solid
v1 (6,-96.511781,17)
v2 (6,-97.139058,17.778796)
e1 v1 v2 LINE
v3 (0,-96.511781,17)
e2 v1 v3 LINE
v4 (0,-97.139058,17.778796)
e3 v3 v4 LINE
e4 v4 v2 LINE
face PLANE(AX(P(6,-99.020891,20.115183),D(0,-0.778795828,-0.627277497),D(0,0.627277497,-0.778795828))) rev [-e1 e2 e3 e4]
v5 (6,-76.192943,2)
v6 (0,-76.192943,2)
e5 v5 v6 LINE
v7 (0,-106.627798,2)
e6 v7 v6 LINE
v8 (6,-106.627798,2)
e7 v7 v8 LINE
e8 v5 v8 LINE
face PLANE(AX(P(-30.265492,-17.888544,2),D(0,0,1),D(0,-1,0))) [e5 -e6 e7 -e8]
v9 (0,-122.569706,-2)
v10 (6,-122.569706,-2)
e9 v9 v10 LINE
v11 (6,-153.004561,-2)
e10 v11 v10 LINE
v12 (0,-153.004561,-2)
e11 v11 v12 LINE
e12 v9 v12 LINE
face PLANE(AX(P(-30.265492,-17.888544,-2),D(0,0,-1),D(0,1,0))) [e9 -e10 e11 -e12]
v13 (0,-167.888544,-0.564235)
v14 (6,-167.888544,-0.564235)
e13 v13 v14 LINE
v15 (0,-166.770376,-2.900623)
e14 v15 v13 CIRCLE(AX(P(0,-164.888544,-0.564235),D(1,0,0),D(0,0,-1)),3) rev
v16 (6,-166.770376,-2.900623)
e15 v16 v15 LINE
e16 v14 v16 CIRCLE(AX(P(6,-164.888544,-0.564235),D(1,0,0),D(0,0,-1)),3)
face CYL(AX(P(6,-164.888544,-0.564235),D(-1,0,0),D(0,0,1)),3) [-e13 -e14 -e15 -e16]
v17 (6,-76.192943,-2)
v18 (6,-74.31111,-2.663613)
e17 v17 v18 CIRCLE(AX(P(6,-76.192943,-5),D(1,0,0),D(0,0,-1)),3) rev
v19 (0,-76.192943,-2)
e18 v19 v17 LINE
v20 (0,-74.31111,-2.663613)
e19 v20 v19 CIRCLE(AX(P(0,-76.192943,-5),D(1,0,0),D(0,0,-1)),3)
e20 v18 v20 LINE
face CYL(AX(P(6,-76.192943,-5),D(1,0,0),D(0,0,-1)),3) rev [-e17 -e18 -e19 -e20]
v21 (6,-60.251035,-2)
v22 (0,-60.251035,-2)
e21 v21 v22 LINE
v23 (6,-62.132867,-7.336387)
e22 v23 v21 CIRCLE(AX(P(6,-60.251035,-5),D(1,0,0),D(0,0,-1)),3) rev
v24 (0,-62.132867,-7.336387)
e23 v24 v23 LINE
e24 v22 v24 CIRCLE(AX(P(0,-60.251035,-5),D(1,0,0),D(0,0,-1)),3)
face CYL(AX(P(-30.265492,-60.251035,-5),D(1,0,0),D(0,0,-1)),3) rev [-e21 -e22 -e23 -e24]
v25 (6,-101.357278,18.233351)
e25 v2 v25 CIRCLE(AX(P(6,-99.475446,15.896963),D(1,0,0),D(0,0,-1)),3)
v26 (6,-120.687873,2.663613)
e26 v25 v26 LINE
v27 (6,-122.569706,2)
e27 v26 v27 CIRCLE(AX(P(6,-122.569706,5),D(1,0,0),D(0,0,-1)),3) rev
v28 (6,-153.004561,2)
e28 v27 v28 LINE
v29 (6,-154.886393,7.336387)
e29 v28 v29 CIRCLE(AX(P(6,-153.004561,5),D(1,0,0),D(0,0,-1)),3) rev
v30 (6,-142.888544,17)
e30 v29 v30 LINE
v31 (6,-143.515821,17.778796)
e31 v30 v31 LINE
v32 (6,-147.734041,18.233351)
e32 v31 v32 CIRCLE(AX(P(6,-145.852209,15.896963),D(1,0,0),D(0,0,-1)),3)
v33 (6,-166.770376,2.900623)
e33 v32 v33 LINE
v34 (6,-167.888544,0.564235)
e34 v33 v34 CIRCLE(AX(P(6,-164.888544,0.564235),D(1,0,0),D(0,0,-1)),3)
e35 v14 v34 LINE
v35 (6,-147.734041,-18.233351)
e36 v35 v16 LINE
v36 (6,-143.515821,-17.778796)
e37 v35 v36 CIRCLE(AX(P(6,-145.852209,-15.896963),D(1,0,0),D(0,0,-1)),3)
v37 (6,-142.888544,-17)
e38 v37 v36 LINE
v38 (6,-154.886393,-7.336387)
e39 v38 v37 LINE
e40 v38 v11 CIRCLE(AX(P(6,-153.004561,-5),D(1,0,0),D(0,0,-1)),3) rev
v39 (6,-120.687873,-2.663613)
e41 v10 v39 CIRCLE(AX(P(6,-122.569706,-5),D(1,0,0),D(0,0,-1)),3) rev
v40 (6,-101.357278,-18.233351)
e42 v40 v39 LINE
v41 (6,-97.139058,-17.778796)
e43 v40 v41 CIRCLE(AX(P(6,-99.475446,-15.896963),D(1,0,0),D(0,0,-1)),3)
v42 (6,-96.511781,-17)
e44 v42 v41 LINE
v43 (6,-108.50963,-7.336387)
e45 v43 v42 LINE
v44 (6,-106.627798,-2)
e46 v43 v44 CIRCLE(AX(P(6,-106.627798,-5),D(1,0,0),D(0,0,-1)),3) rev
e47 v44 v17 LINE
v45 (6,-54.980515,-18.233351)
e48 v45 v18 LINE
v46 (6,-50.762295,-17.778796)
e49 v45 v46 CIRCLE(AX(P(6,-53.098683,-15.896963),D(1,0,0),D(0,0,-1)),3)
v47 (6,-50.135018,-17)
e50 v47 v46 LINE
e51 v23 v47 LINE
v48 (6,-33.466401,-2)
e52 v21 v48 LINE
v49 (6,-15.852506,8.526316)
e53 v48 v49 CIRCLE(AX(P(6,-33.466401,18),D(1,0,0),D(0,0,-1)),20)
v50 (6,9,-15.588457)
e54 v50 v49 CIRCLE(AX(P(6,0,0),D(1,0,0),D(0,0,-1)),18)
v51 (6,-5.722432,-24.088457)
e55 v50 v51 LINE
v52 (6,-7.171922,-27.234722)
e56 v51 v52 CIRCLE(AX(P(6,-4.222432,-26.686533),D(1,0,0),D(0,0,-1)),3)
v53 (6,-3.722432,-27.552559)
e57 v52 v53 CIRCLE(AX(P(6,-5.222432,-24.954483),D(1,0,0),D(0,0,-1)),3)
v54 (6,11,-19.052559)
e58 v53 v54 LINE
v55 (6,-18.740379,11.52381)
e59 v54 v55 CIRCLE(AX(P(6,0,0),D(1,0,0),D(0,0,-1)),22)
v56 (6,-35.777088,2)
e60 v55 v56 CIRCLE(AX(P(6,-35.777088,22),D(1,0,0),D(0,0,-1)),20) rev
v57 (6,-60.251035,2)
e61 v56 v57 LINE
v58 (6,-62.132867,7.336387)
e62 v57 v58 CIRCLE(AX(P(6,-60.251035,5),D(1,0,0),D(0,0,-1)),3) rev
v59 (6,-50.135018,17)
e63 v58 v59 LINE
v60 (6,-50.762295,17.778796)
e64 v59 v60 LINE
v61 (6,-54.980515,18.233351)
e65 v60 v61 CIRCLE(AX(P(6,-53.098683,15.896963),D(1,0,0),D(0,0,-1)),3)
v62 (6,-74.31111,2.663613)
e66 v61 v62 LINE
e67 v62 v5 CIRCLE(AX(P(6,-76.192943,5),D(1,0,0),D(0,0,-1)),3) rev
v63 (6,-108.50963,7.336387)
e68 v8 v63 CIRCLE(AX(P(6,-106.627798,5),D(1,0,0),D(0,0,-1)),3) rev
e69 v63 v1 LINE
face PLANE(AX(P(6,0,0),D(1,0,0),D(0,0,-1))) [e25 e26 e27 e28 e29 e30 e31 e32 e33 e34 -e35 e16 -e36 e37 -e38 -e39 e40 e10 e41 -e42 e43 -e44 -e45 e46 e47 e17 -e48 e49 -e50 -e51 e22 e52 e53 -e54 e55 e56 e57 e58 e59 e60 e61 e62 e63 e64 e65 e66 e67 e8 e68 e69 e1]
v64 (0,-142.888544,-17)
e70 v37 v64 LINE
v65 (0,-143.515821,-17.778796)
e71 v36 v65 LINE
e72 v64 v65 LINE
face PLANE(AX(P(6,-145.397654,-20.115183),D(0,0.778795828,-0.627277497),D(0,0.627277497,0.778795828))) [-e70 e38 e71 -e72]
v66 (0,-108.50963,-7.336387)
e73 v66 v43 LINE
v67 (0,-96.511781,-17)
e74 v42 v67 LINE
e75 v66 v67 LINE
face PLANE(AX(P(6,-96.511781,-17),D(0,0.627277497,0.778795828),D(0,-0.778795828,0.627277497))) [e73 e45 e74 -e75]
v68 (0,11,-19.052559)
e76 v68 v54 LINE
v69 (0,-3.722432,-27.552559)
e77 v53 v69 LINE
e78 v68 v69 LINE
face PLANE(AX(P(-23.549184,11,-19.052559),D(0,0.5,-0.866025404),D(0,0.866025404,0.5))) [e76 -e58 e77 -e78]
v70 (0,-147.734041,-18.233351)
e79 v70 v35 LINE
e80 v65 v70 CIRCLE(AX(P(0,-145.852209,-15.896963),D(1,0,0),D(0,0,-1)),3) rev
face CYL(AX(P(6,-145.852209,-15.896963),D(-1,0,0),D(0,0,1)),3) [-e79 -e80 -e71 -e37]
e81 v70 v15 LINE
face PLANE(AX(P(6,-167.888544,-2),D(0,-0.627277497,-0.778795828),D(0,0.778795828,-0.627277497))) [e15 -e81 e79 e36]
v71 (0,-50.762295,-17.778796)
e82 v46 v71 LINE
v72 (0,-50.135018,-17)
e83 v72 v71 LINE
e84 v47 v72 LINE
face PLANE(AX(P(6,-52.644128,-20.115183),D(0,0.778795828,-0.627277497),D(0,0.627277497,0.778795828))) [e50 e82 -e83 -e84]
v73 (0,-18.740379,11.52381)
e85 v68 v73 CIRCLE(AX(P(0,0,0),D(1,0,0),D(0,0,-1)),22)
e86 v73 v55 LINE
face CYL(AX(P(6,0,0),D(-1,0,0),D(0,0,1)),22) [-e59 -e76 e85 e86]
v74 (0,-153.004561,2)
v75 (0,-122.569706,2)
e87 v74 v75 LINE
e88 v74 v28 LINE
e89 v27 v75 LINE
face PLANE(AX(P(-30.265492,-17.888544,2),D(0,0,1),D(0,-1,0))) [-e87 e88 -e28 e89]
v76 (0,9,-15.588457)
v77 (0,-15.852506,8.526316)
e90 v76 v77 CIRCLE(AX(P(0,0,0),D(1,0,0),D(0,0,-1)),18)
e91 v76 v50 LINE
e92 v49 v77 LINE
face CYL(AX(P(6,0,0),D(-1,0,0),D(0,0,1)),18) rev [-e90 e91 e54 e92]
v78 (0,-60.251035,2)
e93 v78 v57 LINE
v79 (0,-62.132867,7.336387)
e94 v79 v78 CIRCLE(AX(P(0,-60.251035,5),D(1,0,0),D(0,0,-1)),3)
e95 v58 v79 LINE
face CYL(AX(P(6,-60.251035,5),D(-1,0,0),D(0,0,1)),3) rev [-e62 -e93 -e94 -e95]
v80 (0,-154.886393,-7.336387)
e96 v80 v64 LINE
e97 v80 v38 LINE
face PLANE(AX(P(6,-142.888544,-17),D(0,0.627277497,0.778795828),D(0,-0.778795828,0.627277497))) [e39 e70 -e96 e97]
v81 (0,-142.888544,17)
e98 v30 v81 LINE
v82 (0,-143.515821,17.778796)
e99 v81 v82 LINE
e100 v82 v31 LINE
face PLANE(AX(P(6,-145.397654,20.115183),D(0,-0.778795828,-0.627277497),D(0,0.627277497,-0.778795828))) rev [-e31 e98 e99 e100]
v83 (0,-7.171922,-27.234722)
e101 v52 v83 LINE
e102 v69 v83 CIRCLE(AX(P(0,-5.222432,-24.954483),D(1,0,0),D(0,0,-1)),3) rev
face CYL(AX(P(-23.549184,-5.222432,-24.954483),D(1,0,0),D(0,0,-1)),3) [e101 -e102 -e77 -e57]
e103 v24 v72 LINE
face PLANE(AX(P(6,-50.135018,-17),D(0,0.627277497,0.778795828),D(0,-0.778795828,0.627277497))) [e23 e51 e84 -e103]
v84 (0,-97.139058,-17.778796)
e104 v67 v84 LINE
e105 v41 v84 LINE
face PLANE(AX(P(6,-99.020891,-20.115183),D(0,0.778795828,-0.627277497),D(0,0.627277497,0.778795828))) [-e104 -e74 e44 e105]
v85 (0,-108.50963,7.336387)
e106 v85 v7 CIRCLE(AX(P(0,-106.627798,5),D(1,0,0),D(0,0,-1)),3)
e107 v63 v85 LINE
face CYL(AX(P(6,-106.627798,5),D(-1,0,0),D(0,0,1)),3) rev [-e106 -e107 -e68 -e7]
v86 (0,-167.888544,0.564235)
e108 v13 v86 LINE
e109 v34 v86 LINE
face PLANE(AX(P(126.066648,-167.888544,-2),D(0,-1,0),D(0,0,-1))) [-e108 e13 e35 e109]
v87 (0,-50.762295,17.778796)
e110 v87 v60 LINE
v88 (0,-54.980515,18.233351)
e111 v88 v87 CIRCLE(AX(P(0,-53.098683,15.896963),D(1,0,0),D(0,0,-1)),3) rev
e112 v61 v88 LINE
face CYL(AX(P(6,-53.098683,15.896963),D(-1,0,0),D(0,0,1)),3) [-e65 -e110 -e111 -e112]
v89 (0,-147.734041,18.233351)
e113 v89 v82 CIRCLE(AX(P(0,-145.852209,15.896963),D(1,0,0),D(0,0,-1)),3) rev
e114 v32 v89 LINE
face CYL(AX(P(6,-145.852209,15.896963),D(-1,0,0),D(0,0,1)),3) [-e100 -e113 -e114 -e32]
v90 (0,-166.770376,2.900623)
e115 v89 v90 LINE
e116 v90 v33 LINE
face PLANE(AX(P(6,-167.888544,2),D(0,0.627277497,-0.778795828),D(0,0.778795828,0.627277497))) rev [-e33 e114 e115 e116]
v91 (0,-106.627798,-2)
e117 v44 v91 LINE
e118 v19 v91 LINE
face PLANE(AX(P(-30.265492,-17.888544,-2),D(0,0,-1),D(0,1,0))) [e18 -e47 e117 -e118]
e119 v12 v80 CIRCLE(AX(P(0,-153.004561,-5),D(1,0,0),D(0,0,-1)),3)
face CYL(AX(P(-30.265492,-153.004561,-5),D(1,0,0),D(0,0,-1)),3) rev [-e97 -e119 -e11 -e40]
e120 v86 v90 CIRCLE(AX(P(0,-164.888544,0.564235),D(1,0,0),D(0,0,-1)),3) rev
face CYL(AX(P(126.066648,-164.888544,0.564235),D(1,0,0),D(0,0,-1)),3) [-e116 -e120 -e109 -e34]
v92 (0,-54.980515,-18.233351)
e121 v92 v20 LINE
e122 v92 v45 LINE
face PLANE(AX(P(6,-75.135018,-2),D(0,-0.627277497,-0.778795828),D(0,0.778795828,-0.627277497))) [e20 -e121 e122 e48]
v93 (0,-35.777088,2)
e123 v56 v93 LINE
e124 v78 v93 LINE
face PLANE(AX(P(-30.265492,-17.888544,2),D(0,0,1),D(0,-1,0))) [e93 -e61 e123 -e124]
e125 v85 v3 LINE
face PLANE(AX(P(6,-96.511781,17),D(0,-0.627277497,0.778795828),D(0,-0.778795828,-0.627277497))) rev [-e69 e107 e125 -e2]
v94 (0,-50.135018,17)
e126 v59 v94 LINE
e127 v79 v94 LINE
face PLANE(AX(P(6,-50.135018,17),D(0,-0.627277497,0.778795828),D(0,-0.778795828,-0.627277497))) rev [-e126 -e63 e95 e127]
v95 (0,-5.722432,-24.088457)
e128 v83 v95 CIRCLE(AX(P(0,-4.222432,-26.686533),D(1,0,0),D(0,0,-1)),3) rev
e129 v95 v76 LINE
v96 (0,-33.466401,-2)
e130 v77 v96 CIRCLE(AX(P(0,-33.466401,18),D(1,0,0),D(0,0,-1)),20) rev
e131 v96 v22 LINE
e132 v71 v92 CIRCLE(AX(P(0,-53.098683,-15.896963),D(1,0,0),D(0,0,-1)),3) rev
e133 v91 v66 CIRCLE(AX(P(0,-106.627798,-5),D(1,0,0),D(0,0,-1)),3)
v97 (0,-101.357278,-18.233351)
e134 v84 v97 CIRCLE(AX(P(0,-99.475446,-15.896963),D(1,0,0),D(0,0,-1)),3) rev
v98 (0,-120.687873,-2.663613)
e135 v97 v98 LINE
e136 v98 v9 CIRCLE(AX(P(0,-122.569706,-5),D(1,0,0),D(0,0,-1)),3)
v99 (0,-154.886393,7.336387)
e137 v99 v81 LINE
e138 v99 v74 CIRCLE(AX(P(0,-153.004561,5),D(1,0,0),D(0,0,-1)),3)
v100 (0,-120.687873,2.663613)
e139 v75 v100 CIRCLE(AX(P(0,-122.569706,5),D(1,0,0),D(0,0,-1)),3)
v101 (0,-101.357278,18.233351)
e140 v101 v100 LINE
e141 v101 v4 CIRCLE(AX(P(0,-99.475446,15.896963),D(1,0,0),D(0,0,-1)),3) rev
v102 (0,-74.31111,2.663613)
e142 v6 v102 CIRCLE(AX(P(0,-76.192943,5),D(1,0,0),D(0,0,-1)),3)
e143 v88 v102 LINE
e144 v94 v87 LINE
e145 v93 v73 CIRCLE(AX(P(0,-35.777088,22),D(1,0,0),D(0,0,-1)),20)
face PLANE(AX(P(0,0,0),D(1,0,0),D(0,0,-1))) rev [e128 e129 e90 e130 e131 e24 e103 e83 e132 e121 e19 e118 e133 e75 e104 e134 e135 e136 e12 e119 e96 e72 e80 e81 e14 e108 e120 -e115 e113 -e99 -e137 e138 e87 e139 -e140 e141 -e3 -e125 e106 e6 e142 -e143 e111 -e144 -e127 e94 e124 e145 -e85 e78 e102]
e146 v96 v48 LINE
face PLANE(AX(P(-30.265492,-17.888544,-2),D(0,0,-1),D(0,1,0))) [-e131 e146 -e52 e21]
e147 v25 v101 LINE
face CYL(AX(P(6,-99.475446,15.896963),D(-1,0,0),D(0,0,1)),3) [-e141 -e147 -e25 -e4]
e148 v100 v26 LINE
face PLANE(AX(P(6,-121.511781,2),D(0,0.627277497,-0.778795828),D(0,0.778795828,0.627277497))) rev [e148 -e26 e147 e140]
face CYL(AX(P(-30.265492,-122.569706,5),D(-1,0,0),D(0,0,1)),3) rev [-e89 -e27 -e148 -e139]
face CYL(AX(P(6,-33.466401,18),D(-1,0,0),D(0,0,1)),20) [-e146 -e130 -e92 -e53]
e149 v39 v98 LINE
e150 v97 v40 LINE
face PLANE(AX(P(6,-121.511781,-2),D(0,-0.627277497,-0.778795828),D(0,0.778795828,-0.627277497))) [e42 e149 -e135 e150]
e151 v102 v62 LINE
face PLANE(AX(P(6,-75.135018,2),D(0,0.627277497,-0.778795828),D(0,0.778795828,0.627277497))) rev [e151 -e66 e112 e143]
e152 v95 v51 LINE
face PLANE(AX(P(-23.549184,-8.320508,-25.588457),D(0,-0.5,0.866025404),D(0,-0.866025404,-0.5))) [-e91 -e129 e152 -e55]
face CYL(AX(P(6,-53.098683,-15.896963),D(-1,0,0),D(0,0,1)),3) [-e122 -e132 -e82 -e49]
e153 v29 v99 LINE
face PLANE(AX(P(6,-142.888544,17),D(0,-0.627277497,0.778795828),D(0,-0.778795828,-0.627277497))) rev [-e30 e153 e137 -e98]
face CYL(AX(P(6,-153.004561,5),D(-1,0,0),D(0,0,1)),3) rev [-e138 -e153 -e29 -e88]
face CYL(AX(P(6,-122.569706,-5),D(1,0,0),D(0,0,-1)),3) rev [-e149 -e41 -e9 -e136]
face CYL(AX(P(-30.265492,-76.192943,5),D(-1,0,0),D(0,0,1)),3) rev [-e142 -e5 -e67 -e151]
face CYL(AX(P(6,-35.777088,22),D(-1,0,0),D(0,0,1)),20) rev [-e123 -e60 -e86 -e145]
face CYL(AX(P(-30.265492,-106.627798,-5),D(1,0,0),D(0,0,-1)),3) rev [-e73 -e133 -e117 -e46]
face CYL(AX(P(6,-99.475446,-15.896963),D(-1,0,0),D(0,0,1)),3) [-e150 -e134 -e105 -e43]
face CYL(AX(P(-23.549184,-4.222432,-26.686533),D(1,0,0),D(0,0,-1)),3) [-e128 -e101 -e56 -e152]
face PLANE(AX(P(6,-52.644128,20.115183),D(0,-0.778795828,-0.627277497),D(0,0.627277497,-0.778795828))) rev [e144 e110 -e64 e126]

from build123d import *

# Parameters (mm, degrees)
SKETCH1_R           = 22
SKETCH1_R_2         = 18
BOSS_EXTRUDE1_DEPTH = 6
BOSS_EXTRUDE2_DEPTH = 6
CUT_EXTRUDE1_DEPTH  = 37.933063475
SKETCH4_W           = 4
SKETCH4_H           = 30
BOSS_EXTRUDE3_DEPTH = 6
CUT_EXTRUDE2_DEPTH  = 57.332617611
FILLET1_R           = 20
FILLET2_R           = 20
SKETCH6_W           = 4
SKETCH6_H           = 120
BOSS_EXTRUDE4_DEPTH = 6
BOSS_EXTRUDE5_DEPTH = 6
FILLET3_R           = 3


with BuildPart() as part:
    # Sketch1 → Boss-Extrude1 (new body)
    with BuildSketch(Plane(origin=(0, 0, 0), x_dir=(0, 0, -1), z_dir=(1, 0, 0))):
        Circle(SKETCH1_R)
        Circle(SKETCH1_R_2, mode=Mode.SUBTRACT)
    extrude(amount=BOSS_EXTRUDE1_DEPTH)

    # Sketch2 → Boss-Extrude2 (add)
    with BuildSketch(Plane(origin=(6, 0, 0), x_dir=(0, 0, -1), z_dir=(1, 0, 0))):
        Polygon((19.052558883, 11), (29.052558883, -6.320508076), (25.588457268, -8.320508076), (15.588457268, 9), align=None)
    extrude(amount=-BOSS_EXTRUDE2_DEPTH)

    # Sketch3 → Cut-Extrude1 (cut, through all)
    with BuildSketch(Plane(origin=(6, 0, 0), x_dir=(0, 0, -1), z_dir=(1, 0, 0))):
        with BuildLine():
            ThreePointArc((18, 0), (14.280360125, -10.957705722), (4.658742812, -17.386664873))
            Line((4.658742812, -17.386664873), (5.694018992, -21.250368178))
            ThreePointArc((5.694018992, -21.250368178), (16.84102585, -14.15555892), (21.913012588, -1.95445115))
            Line((21.913012588, -1.95445115), (15.588457268, 9))
            ThreePointArc((15.588457268, 9), (17.386664873, 4.658742812), (18, 0))
        make_face()
    extrude(amount=-CUT_EXTRUDE1_DEPTH, mode=Mode.SUBTRACT)

    # Sketch4 → Boss-Extrude3 (add)
    with BuildSketch(Plane(origin=(6, 0, 0), x_dir=(0, 0, -1), z_dir=(1, 0, 0))):
        with Locations((0, -32.88854382)):
            Rectangle(SKETCH4_W, SKETCH4_H)
    extrude(amount=-BOSS_EXTRUDE3_DEPTH)

    # Sketch5 → Cut-Extrude2 (cut, through all)
    with BuildSketch(Plane(origin=(6, 0, 0), x_dir=(0, 0, -1), z_dir=(1, 0, 0))):
        with BuildLine():
            Line((2, -21.9089023), (2, -17.88854382))
            Line((2, -17.88854382), (4.658742812, -17.386664873))
            Line((4.658742812, -17.386664873), (5.694018992, -21.250368178))
            ThreePointArc((5.694018992, -21.250368178), (3.876129227, -21.742981124), (2, -21.9089023))
        make_face()
    extrude(amount=-CUT_EXTRUDE2_DEPTH, mode=Mode.SUBTRACT)

    # Fillet1
    # the kernel refuses this fillet: 20 mm, written as the material it adds along each edge
    with BuildSketch(Plane(origin=(6, -21.9089023, 2), x_dir=(0, -1, 0), z_dir=(-1, 0, 0))) as fillet1_piece_1:
        with BuildLine():
            CenterArc((13.86818534, 20), FILLET1_R, 211.588135505, 58.411864495)
            ThreePointArc((-3.16852306, 9.523809524), (-1.033875129, 4.945015522), (0, 0))
            Line((0, 0), (13.86818534, 0))
        make_face()
    extrude(amount=6)
    # the kernel refuses this fillet: 20 mm, written as the material it takes off along each edge
    with BuildSketch(Plane(origin=(36, -17.88854382, -2), x_dir=(0, -1, 0), z_dir=(-1, 0, 0))) as fillet1_2_piece_1:
        with BuildLine():
            CenterArc((12, 20), FILLET1_R, 233.130102354, 36.869897646)
            Line((0, 4), (0, 0))
            Line((0, 0), (12, 0))
        make_face()
    extrude(amount=66, mode=Mode.SUBTRACT)

    # Fillet2
    fillet2_edges = [part.edges().sort_by_distance(p)[0] for p in [
        (3, -17.88854382, 2),
    ]]
    fillet(fillet2_edges, radius=FILLET2_R)

    # Sketch6 → Boss-Extrude4 (add)
    with BuildSketch(Plane.ZY):
        with Locations((0, -107.88854382)):
            Rectangle(SKETCH6_W, SKETCH6_H)
    extrude(amount=-BOSS_EXTRUDE4_DEPTH)

    # Sketch7 → Boss-Extrude5 (add)
    with BuildSketch(Plane(origin=(0, 0, -2), x_dir=(0, 0, -1), z_dir=(1, 0, 0))):
        Polygon((-4, -167.88854382), (-22.115183313, -145.397653808), (-19, -142.88854382), (-4, -161.511780713), align=None)
        Polygon((-4, -115.135017606), (-4, -121.511780713), (-22.115183313, -99.0208907), (-19, -96.511780713), align=None)
        Polygon((-4, -68.758254499), (-4, -75.135017606), (-22.115183313, -52.644127593), (-19, -50.135017606), align=None)
    boss_extrude5 = extrude(amount=BOSS_EXTRUDE5_DEPTH)

    # Mirror1: Boss-Extrude5 across plane
    add(boss_extrude5.mirror(Plane.XY))

    # Fillet3
    # the kernel refuses this fillet: 3 mm, written as the material it adds along each edge
    with BuildSketch(Plane(origin=(0, -161.511780713, 2), x_dir=(0, 1, 0), z_dir=(1, 0, 0)), Plane(origin=(0, -115.135017606, 2), x_dir=(0, 1, 0), z_dir=(1, 0, 0)), Plane(origin=(0, -68.758254499, 2), x_dir=(0, 1, 0), z_dir=(1, 0, 0))) as fillet3_piece_1:
        with BuildLine():
            CenterArc((FILLET3_R * 2.83573990297, FILLET3_R), FILLET3_R, 128.849545597, 141.150454403)
            Line((FILLET3_R * 2.20846240609, FILLET3_R * 1.77879582813), (0, 0))
            Line((0, 0), (FILLET3_R * 2.83573990297, 0))
        make_face()
    extrude(amount=6)
    with BuildSketch(Plane(origin=(0, -121.511780713, 2), x_dir=(0, 0.7787958281290415, 0.6272774968774191), z_dir=(1, 0, 0)), Plane(origin=(0, -75.135017606, 2), x_dir=(0, 0.7787958281290404, 0.6272774968774205), z_dir=(1, 0, 0)), Plane(origin=(0, -121.511780713, -2), x_dir=(0, -1, 0), z_dir=(1, 0, 0)), Plane(origin=(0, -75.135017606, -2), x_dir=(0, -1, 0), z_dir=(1, 0, 0))) as fillet3_piece_2:
        with BuildLine():
            CenterArc((FILLET3_R * 0.352641650581, FILLET3_R), FILLET3_R, 231.150454403, 38.849545597)
            Line((-FILLET3_R * 0.274635846297, FILLET3_R * 0.221204171871), (0, 0))
            Line((0, 0), (FILLET3_R * 0.352641650581, 0))
        make_face()
    extrude(amount=6)
    with BuildSketch(Plane(origin=(0, -161.511780713, -2), x_dir=(0, 1, 0), z_dir=(1, 0, 0)), Plane(origin=(0, -115.135017606, -2), x_dir=(0, 1, 0), z_dir=(1, 0, 0)), Plane(origin=(0, -68.758254499, -2), x_dir=(0, 1, 0), z_dir=(1, 0, 0))) as fillet3_piece_3:
        with BuildLine():
            CenterArc((FILLET3_R * 2.83573990297, -FILLET3_R), FILLET3_R, 90, 141.150454403)
            Line((FILLET3_R * 2.20846240609, -FILLET3_R * 1.77879582813), (0, 0))
            Line((0, 0), (FILLET3_R * 2.83573990297, 0))
        make_face()
    extrude(amount=6)
    # the kernel refuses this fillet: 3 mm, written as the material it takes off along each edge
    with BuildSketch(Plane(origin=(-3.589411592, -167.88854382, 2), x_dir=(0, 0.7787958281290398, 0.6272774968774211), z_dir=(1, 0, 0)), Plane(origin=(-3.589411592, -167.88854382, -2), x_dir=(0, 0, 1), z_dir=(1, 0, 0))) as fillet3_2_piece_1:
        with BuildLine():
            CenterArc((FILLET3_R * 0.478588212289, -FILLET3_R), FILLET3_R, 90, 51.150454403)
            Line((-FILLET3_R * 0.30020761584, -FILLET3_R * 0.372722503123), (0, 0))
            Line((0, 0), (FILLET3_R * 0.478588212289, 0))
        make_face()
    extrude(amount=13.178823184, mode=Mode.SUBTRACT)
    with BuildSketch(Plane(origin=(-7.5, -145.397653808, 20.115183313), x_dir=(0, 0.6272774968774232, -0.7787958281290382), z_dir=(1, 0, 0)), Plane(origin=(-7.5, -99.0208907, 20.115183313), x_dir=(0, 0.6272774968774221, -0.7787958281290391), z_dir=(1, 0, 0)), Plane(origin=(-7.5, -52.644127593, 20.115183313), x_dir=(0, 0.6272774968774235, -0.778795828129038), z_dir=(1, 0, 0)), Plane(origin=(-7.5, -145.397653808, -20.115183313), x_dir=(0, -0.7787958281290382, 0.627277496877423), z_dir=(1, 0, 0)), Plane(origin=(-7.5, -99.0208907, -20.115183313), x_dir=(0, -0.7787958281290382, 0.627277496877423), z_dir=(1, 0, 0)), Plane(origin=(-7.5, -52.644127593, -20.115183313), x_dir=(0, -0.7787958281290385, 0.6272774968774228), z_dir=(1, 0, 0))) as fillet3_2_piece_2:
        with BuildLine():
            CenterArc((FILLET3_R, -FILLET3_R), FILLET3_R, 90, 90)
            Line((0, -FILLET3_R), (0, 0))
            Line((0, 0), (FILLET3_R, 0))
        make_face()
    extrude(amount=21, mode=Mode.SUBTRACT)
    with BuildSketch(Plane(origin=(13.5, -8.320508076, -25.588457268), x_dir=(0, 0.8660254037844379, 0.5000000000000012), z_dir=(-1, 0, 0)), Plane(origin=(13.5, -6.320508076, -29.052558883), x_dir=(0, -0.5000000000000019, 0.8660254037844376), z_dir=(-1, 0, 0))) as fillet3_2_piece_3:
        with BuildLine():
            CenterArc((FILLET3_R, FILLET3_R), FILLET3_R, 180, 90)
            Line((0, FILLET3_R), (0, 0))
            Line((0, 0), (FILLET3_R, 0))
        make_face()
    extrude(amount=21, mode=Mode.SUBTRACT)


solid = part.part
